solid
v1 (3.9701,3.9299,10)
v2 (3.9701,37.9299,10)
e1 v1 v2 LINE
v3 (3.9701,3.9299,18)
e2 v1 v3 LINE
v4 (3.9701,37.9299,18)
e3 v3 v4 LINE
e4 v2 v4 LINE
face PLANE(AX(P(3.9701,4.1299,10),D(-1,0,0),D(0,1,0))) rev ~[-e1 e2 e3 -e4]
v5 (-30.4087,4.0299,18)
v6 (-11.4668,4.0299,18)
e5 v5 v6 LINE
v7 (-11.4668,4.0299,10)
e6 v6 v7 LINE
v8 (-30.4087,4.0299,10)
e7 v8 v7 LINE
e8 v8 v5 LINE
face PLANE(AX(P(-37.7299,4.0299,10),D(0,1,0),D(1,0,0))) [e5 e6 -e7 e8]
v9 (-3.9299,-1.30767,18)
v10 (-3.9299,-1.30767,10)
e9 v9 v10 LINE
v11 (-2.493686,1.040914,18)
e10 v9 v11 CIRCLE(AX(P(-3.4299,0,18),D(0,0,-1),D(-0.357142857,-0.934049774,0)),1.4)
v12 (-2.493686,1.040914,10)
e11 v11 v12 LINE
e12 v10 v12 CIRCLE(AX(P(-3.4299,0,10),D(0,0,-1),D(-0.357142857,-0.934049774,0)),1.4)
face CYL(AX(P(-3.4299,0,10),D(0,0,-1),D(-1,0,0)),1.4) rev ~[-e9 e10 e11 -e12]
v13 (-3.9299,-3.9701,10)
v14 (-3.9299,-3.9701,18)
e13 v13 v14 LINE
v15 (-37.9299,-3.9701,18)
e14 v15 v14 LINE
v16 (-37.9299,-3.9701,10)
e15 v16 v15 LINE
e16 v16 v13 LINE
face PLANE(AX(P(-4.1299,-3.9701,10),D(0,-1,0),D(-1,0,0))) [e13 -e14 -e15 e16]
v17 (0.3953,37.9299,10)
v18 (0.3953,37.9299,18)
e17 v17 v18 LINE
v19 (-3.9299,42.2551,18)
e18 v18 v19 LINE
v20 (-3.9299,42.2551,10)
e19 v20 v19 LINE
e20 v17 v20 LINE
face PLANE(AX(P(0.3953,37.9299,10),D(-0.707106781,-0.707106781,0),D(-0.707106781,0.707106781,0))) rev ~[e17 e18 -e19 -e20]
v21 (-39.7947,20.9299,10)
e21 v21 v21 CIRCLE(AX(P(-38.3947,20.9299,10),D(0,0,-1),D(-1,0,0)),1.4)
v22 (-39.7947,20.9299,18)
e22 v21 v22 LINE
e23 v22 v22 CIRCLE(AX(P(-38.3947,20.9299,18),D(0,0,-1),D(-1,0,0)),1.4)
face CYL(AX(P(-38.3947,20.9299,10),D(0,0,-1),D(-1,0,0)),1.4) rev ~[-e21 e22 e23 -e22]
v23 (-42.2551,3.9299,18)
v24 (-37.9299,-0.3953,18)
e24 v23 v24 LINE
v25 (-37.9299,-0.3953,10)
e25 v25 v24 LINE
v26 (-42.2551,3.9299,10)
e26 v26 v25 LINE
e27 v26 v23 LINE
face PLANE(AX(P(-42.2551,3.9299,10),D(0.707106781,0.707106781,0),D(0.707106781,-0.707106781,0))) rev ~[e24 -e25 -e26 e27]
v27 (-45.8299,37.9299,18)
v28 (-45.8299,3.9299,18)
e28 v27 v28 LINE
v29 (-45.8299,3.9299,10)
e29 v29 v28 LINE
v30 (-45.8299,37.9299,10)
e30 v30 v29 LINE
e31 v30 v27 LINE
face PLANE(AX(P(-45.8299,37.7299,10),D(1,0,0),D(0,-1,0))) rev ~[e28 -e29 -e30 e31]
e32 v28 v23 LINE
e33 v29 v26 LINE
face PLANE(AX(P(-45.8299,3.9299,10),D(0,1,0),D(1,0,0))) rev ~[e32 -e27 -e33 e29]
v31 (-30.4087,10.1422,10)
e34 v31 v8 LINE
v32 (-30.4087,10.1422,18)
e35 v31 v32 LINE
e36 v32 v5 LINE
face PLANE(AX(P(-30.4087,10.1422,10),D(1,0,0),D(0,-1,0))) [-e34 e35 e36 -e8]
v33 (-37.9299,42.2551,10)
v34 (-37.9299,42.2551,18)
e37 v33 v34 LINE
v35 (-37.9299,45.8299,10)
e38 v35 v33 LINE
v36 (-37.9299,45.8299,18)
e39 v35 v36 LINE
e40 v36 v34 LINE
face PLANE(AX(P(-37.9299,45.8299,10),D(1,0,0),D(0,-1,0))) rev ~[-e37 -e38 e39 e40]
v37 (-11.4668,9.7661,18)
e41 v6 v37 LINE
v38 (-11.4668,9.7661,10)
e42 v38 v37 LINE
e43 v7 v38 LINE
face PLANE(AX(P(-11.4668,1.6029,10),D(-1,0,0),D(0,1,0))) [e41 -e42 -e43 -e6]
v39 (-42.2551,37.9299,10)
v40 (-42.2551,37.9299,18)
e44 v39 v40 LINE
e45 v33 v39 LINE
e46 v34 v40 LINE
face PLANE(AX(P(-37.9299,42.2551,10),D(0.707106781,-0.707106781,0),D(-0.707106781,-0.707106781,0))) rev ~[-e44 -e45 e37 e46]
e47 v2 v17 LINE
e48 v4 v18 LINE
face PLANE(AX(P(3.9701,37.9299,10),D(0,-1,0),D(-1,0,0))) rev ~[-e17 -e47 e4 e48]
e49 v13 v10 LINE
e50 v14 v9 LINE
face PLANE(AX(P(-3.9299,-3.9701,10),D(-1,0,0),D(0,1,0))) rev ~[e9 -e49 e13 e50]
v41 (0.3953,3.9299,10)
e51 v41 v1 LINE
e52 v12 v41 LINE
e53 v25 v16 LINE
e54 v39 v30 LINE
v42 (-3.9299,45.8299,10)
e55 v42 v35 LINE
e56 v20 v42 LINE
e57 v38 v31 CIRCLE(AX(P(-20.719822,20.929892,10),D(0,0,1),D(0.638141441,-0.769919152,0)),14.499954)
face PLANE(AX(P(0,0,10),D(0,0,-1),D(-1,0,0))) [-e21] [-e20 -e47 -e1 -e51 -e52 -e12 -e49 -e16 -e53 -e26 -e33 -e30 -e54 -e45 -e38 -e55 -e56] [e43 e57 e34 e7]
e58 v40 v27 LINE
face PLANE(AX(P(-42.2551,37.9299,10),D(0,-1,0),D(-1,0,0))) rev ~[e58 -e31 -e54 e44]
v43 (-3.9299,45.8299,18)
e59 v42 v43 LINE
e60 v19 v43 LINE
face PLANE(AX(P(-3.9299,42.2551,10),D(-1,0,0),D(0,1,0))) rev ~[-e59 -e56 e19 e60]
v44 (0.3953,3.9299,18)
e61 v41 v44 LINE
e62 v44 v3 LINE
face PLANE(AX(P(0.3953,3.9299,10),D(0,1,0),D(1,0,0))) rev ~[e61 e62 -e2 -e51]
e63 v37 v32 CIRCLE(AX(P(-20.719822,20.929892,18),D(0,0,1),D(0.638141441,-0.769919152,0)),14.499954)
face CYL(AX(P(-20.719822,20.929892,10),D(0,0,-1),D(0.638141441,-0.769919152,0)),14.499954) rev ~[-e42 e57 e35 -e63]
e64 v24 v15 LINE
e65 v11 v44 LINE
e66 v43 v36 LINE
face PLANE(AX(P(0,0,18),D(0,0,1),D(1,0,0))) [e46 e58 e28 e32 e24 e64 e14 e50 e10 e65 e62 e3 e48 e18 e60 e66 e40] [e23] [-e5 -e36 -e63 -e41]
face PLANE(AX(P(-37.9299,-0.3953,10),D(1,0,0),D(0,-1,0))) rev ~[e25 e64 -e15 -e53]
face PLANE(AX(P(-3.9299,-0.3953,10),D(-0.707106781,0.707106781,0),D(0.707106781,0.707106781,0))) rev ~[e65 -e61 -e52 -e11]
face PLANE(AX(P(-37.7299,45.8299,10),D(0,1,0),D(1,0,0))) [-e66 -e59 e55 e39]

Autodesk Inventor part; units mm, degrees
ref_plane "YZ Plane" through (0, 0, 0) normal (1, 0, 0) x (0, 1, 0)
ref_plane "XZ Plane" through (0, 0, 0) normal (0, 1, 0) x (-1, 0, 0)
ref_plane "Work Plane1" through (0, 0, 10) normal (0, 0, 1) x (1, 0, 0)
sketch "Sketch1" plane through (0, 0, 10) normal (0, 0, 1) x (1, 0, 0)
  line L0 (-4.0299, -0.3538) -> (-2.2322, 1.4439) construction
  arc A0 (-1.4439, 2.2322) -> (-2.2322, 1.4439) centre (-0.9299, 0.9299) ccw construction
  line L1 (-1.4439, 2.2322) -> (0.3538, 4.0299) construction
  line L2 (-37.8299, 42.2137) -> (-37.8299, 45.8299) construction
  line L3 (-37.8299, 45.8299) -> (-4.0299, 45.8299) construction
  line L4 (-4.0299, 45.8299) -> (-4.0299, 42.2137) construction
  line L5 (-4.0299, 4.0299) -> (0.3538, 4.0299) projected
  circle A1 centre (-20.9299, 20.9299) radius 17.5 construction
  line L6 (-20.9299, 58.9723) -> (17.1124, 20.9299) construction
  line L7 (17.1124, 20.9299) -> (-20.9299, -17.1124) construction
  line L8 (-20.9299, -17.1124) -> (-58.9723, 20.9299) construction
  line L9 (-58.9723, 20.9299) -> (-20.9299, 58.9723) construction
  line L10 (-20.9299, 58.9723) -> (-20.9299, -17.1124) construction
  line L11 (17.1124, 20.9299) -> (-58.9723, 20.9299) construction
  line L12 (-20.9299, 58.9723) -> (32.8701, 58.9723) construction
  line L13 (-43.2198, 43.4299) -> (1.7802, 43.4299) construction
  line L14 (1.7802, 43.4299) -> (1.7802, -1.5701) construction
  line L15 (1.7802, -1.5701) -> (-43.2198, -1.5701) construction
  line L16 (-43.2198, -1.5701) -> (-43.2198, 43.4299) construction
  line L17 (-43.2198, 5.1774) -> (-43.2198, 36.6824)
  line L18 (-43.2198, 36.6824) -> (-36.4723, 43.4299)
  line L19 (-36.4723, 43.4299) -> (-5.3876, 43.4299)
  line L20 (-5.3876, 43.4299) -> (1.7802, 36.2621)
  line L21 (1.7802, 36.2621) -> (1.7802, 5.5977)
  line L22 (1.7802, 5.5977) -> (-5.3876, -1.5701)
  line L23 (-5.3876, -1.5701) -> (-36.4723, -1.5701)
  line L24 (-36.4723, -1.5701) -> (-43.2198, 5.1774)
  line L25 (-4.0299, 42.2137) -> (-37.8299, 42.2137) projected
  line L26 (-4.0299, -0.3538) -> (-4.0299, 4.0299) projected
  circle A2 centre (-20.7198, 20.9299) radius 7.0417 construction
  arc A3 (-7.3745, 3.5) -> (-34.4854, 3.5) centre (-20.9299, 0) ccw construction
  arc A4 (-11.4668, 9.7661) -> (-30.4087, 10.1422) centre (-20.7198, 20.9299) ccw
  line L27 (-30.5806, 10.1422) -> (-30.4087, 10.1422)
  line L28 (-30.4087, 10.1422) -> (-30.4087, 1.6029)
  line L29 (-30.4087, 1.6029) -> (-11.4668, 1.6029)
  line L30 (-11.4668, 1.6029) -> (-11.4668, 9.7661)
  line L31 (-43.2198, 43.4299) -> (-10.4667, 10.6769) construction
  line L32 (-8.5595, 8.5517) -> (1.7802, -1.5701) construction
  line L33 (1.7802, 43.4299) -> (-25.699, 15.9507) construction
  line L34 (-30.9728, 10.6769) -> (-43.2198, -1.5701) construction
  point P0 (-37.8299, 4.0299)
  dimension "d18" = 53.8
  dimension "d19" = 45
  dimension "d20" = 53.8
  dimension "d21" = 45
  dimension "d22" = 45
  dimension "d68" = 29
extrude "Extrusion1" add sketch "Sketch1" along normal blind 8
sketch "Sketch3" plane through (0, 0, 10) normal (0, 0, -1) x (-1, 0, 0)
  line L0 (37.8299, -0.4701) -> (37.8299, 4.0299) construction
  line L1 (4.0299, 4.0299) -> (4.0299, -0.4701) construction
  line L2 (37.8299, -0.4701) -> (37.8299, 1.1886) construction
  line L3 (4.0299, -3.9701) -> (4.0299, -0.3538) construction
  line L4 (45.8299, 4.0299) -> (42.2137, 4.0299) construction
  line L5 (-0.3538, 4.0299) -> (-3.9701, 4.0299) construction
  line L6 (-3.9701, 37.8299) -> (-0.3538, 37.8299) construction
  line L7 (4.0299, 42.2137) -> (4.0299, 45.8299) construction
  line L8 (37.8299, 45.8299) -> (37.8299, 42.2137) construction
  line L9 (42.2137, 37.8299) -> (45.8299, 37.8299) construction
  line L10 (37.8299, 37.7299) -> (45.8299, 37.7299)
  line L11 (45.8299, 37.7299) -> (45.8299, 4.1299)
  line L12 (45.8299, 4.1299) -> (37.8299, 4.1299)
  line L13 (37.8299, 4.1299) -> (37.8299, 37.7299)
  line L14 (37.7299, 4.0299) -> (4.1299, 4.0299)
  line L15 (4.1299, 4.0299) -> (4.1299, -3.9701)
  line L16 (4.1299, -3.9701) -> (37.7299, -3.9701)
  line L17 (37.7299, -3.9701) -> (37.7299, 4.0299)
  line L18 (4.0299, 4.1299) -> (-3.9701, 4.1299)
  line L19 (-3.9701, 4.1299) -> (-3.9701, 37.7299)
  line L20 (-3.9701, 37.7299) -> (4.0299, 37.7299)
  line L21 (4.0299, 37.7299) -> (4.0299, 4.1299)
  line L22 (4.1299, 37.8299) -> (37.7299, 37.8299)
  line L23 (37.7299, 37.8299) -> (37.7299, 45.8299)
  line L24 (37.7299, 45.8299) -> (4.1299, 45.8299)
  line L25 (4.1299, 45.8299) -> (4.1299, 37.8299)
  point P0 (0, 0)
  dimension "d23" = 0.1
  dimension "d24" = 0.1
  dimension "d25" = 0.1
  dimension "d26" = 0.1
  dimension "d27" = 0.1
extrude "Extrusion3" add sketch "Sketch3" against normal up to surface (8 mm away)
sketch "Skizze12" plane through (0, 0, 10) normal (0, 0, -1) x (-1, 0, 0)
  line L0 (-0.3124, 4.1299) -> (4.1299, -0.3124) projected
  line L1 (4.1299, -0.3124) -> (4.1299, -3.9701) projected
  line L2 (4.1299, -3.9701) -> (37.7299, -3.9701) construction
  line L3 (37.7299, -3.9701) -> (37.7299, -0.3124) projected
  line L4 (37.7299, -0.3124) -> (42.1723, 4.1299) projected
  line L5 (45.8299, 4.1299) -> (42.1723, 4.1299) projected
  line L6 (45.8299, 37.7299) -> (45.8299, 4.1299) construction
  line L7 (42.1723, 37.7299) -> (45.8299, 37.7299) projected
  line L8 (42.1723, 37.7299) -> (37.7299, 42.1723) projected
  line L9 (37.7299, 42.1723) -> (37.7299, 45.8299) projected
  line L10 (37.7299, 45.8299) -> (4.1299, 45.8299) construction
  line L11 (4.1299, 45.8299) -> (4.1299, 42.1723) projected
  line L12 (4.1299, 42.1723) -> (-0.3124, 37.7299) projected
  line L13 (-3.9701, 37.7299) -> (-0.3124, 37.7299) projected
  line L14 (-3.9701, 4.1299) -> (-3.9701, 37.7299) construction
  line L15 (-0.3124, 4.1299) -> (-3.9701, 4.1299) projected
  line L16 (37.9299, -4.1701) -> (3.9299, -4.1701) construction
  line L17 (3.9299, -4.1701) -> (3.9299, -0.3953)
  line L18 (3.9299, -0.3953) -> (-0.3953, 3.9299)
  line L19 (-0.3953, 3.9299) -> (-4.1701, 3.9299)
  line L20 (-4.1701, 3.9299) -> (-4.1701, 37.9299) construction
  line L21 (-4.1701, 37.9299) -> (-0.3953, 37.9299)
  line L22 (-0.3953, 37.9299) -> (3.9299, 42.2551)
  line L23 (3.9299, 42.2551) -> (3.9299, 46.0299)
  line L24 (3.9299, 46.0299) -> (37.9299, 46.0299) construction
  line L25 (37.9299, 46.0299) -> (37.9299, 42.2551)
  line L26 (37.9299, 42.2551) -> (42.2551, 37.9299)
  line L27 (42.2551, 37.9299) -> (46.0299, 37.9299)
  line L28 (46.0299, 37.9299) -> (46.0299, 3.9299) construction
  line L29 (46.0299, 3.9299) -> (42.2551, 3.9299)
  line L30 (42.2551, 3.9299) -> (37.9299, -0.3953)
  line L31 (37.9299, -0.3953) -> (37.9299, -4.1701)
  line L32 (-3.9701, 37.7299) -> (-3.9701, 37.9299)
  line L33 (37.7299, 45.8299) -> (4.1299, 45.8299) projected
  line L34 (4.1299, 45.8299) -> (3.9299, 45.8299)
  line L35 (37.7299, 45.8299) -> (37.9299, 45.8299)
  line L36 (45.8299, 37.7299) -> (45.8299, 37.9299)
  line L37 (45.8299, 4.1299) -> (45.8299, 3.9299)
  line L38 (37.7299, -3.9701) -> (37.9299, -3.9701)
  line L39 (4.1299, -3.9701) -> (3.9299, -3.9701)
  line L40 (-3.9701, 4.1299) -> (-3.9701, 3.9299)
  point P0 (0, 0)
  dimension "d65" = 0.2
extrude "IM_offset" add sketch "Skizze12" against normal up to surface (8 mm away)
sketch "Sketch14" plane through (0, 0, 10) normal (0, 0, -1) x (-1, 0, 0)
  arc A0 (5.5299, 0) -> (1.3299, 0) centre (3.4299, 0) ccw projected
  line L0 (37.8999, 16.97) -> (37.8999, -16.97) projected
  circle A1 centre (38.3947, 20.9299) radius 1.4
  circle A2 centre (3.4299, 0) radius 1.4
  point P0 (0, 0)
  dimension "d69" = 2.8
  dimension "d70" = 2.8
extrude "Extrusion12" cut sketch "Sketch14" against normal blind 10
properties part number "20_Cube_Insert_RaspiCam_v3"
